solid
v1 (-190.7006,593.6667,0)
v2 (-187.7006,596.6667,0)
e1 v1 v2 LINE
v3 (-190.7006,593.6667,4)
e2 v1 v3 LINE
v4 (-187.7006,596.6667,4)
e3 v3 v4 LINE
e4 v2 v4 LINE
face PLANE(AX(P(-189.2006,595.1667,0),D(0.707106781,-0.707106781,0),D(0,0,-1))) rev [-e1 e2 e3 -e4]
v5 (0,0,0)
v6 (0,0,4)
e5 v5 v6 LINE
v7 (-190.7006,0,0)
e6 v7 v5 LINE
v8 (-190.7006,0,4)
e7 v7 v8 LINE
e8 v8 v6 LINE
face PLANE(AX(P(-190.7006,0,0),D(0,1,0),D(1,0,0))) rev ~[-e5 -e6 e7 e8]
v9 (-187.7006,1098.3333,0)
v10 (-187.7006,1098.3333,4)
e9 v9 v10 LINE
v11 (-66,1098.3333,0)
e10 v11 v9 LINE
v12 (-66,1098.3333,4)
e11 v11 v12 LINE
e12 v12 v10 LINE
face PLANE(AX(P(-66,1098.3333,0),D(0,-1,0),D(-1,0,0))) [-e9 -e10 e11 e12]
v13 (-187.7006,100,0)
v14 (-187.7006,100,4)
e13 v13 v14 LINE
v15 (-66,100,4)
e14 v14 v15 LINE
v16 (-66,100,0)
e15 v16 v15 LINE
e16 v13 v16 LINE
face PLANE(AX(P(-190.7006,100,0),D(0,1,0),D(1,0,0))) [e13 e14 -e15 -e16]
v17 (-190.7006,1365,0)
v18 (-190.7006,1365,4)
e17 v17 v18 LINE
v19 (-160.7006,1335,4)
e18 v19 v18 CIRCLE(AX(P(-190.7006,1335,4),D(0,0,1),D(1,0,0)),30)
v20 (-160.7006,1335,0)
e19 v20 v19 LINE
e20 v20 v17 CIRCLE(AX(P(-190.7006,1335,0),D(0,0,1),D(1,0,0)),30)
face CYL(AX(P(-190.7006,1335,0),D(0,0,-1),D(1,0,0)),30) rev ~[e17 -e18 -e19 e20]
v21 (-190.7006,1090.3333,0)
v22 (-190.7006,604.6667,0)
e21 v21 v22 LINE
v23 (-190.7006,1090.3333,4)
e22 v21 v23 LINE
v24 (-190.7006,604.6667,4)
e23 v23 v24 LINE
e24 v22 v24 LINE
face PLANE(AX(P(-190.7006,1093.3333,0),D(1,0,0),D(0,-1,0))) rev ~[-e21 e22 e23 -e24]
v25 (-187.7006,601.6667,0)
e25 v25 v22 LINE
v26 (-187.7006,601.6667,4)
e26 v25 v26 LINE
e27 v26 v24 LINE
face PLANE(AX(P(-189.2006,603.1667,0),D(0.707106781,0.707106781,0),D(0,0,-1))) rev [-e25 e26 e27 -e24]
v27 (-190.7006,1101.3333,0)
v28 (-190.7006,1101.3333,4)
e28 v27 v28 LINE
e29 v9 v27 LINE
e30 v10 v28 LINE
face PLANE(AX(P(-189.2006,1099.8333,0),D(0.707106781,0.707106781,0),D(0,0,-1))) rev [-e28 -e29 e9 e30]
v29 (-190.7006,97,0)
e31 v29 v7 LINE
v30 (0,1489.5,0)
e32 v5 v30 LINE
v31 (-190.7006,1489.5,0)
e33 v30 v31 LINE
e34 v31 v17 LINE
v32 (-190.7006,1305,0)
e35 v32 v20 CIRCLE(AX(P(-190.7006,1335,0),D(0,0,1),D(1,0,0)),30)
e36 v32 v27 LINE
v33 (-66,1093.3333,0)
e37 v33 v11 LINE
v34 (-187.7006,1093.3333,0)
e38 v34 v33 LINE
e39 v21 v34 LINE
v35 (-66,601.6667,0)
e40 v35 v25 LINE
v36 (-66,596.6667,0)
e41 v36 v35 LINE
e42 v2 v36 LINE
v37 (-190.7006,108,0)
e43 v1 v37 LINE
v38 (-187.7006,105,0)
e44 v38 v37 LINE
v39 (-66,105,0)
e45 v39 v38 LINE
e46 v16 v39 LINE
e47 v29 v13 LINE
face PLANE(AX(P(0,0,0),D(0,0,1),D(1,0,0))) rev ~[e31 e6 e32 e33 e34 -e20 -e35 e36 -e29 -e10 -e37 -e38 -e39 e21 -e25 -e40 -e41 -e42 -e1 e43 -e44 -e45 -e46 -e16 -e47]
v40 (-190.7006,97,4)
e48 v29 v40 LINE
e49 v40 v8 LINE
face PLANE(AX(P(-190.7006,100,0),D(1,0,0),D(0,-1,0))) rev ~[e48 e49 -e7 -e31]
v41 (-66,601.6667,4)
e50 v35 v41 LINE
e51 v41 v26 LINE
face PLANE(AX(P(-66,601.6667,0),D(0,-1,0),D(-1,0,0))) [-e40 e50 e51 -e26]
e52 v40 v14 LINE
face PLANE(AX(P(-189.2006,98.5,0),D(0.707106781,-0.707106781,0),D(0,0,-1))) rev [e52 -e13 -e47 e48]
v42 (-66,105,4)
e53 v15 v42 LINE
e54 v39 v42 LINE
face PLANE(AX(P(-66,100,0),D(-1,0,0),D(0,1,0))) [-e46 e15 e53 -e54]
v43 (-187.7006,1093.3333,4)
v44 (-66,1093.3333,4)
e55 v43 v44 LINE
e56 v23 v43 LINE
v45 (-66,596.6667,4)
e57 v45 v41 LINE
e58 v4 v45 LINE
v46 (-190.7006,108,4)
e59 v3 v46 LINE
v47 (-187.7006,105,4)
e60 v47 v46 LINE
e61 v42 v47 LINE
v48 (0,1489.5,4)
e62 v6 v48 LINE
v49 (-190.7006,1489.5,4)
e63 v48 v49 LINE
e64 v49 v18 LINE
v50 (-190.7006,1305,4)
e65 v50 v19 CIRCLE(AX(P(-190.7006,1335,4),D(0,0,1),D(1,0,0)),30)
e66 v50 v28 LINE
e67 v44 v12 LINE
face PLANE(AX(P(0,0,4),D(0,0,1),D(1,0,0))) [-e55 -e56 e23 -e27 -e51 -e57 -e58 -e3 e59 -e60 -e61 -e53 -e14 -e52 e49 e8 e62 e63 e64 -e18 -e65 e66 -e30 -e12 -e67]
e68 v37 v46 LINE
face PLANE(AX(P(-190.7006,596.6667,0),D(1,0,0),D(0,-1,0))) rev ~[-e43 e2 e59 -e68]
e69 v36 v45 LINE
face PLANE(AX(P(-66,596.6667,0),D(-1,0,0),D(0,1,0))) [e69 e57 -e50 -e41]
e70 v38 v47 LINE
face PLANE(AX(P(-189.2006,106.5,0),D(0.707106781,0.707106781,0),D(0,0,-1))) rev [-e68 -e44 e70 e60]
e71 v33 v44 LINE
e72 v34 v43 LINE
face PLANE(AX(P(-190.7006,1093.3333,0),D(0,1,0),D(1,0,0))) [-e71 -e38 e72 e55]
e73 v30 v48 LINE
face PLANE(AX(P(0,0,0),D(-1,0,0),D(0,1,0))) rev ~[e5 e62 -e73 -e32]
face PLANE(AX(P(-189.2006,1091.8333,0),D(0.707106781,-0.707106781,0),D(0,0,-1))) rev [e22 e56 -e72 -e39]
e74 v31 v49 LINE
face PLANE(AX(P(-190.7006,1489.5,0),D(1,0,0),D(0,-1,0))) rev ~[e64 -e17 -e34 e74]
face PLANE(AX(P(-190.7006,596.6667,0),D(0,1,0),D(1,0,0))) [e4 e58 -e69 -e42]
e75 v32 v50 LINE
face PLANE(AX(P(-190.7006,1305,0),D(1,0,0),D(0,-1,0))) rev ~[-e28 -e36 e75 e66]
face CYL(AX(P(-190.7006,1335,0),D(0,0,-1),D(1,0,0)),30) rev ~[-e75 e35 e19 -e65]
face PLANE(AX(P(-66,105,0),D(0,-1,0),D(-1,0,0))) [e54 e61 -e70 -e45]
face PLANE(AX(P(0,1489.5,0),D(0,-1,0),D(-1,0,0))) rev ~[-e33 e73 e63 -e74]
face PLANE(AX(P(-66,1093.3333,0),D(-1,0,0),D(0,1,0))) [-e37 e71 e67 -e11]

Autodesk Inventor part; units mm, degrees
ref_plane "YZ Plane" through (0, 0, 0) normal (1, 0, 0) x (0, 1, 0)
ref_plane "XZ Plane" through (0, 0, 0) normal (0, 1, 0) x (-1, 0, 0)
ref_plane "XY Plane" through (0, 0, 0) normal (0, 0, 1) x (1, 0, 0)
sketch "Sketch1" plane through (0, 0, 0) normal (0, 0, 1) x (1, 0, 0)
  line L0 (0, 1489.5) -> (-190.7006, 1489.5)
  line L1 (-190.7006, 1489.5) -> (-190.7006, 0)
  line L2 (-190.7006, 0) -> (0, 0)
  line L3 (0, 0) -> (0, 1489.5)
  line L4 (-190.7006, 100) -> (-66, 100)
  line L5 (-66, 100) -> (-66, 105)
  line L6 (-66, 105) -> (-190.7006, 105)
  line L7 (-190.7006, 105) -> (-190.7006, 100)
  line L8 (-190.7006, 596.6667) -> (-66, 596.6667)
  line L9 (-66, 596.6667) -> (-66, 601.6667)
  line L10 (-66, 601.6667) -> (-190.7006, 601.6667)
  line L11 (-190.7006, 601.6667) -> (-190.7006, 596.6667)
  line L12 (-190.7006, 1093.3333) -> (-66, 1093.3333)
  line L13 (-66, 1093.3333) -> (-66, 1098.3333)
  line L14 (-66, 1098.3333) -> (-190.7006, 1098.3333)
  line L15 (-190.7006, 1098.3333) -> (-190.7006, 1093.3333)
  circle A0 centre (-190.7006, 1335) radius 30
  point P0 (-190.7006, 1098.3333)
  point P1 (-190.7006, 1093.3333)
  point P2 (-190.7006, 601.6667)
  point P3 (-190.7006, 596.6667)
  point P4 (-190.7006, 1365)
  point P5 (-190.7006, 1305)
  dimension "d0" = 1489.5
  dimension "d1" = 190.7006
  dimension "d2" = 5
  dimension "d4" = 100
  dimension "d7" = 496.6667
  dimension "d23" = 66
  dimension "d29" = 60
  dimension "d30" = 1335
extrude "Plate1" add sketch "Sketch1" along normal blind 4 contours L3 L2 L1 L4 L5 L6 L8 L9 L10 L12 L13 L14 A0 L0
chamfer "Corner Chamfer1" distance 3 angle 45 6 edges at (-190.7006, 100, 2) (-190.7006, 105, 2) (-190.7006, 596.6667, 2) (-190.7006, 601.6667, 2) (-190.7006, 1098.3333, 2) (-190.7006, 1093.3333, 2)
equation "\"d0\" = Стрингер_длина"
equation "\"d1\" = стрингер_глубина_1"
equation "\"d2\" = паз_под_стрингер_толщина"
equation "\"d7\" = Шаг_шпангоутов"
equation "\"d23\" = паз_под_стрингер_глубина - Thickness"
equation "\"d29\" = 2 * радиус_выреза_под_сварку"
equation "\"d12\" = Thickness"
equation "\"BendRadius\" = Thickness"
equation "\"BendReliefWidth\" = Thickness"
equation "\"BendReliefDepth\" = 0.5 * Thickness"
equation "\"CornerReliefSize\" = 4 * Thickness"
equation "\"MinimumRemnant\" = 2 * Thickness"
equation "\"TransitionRadius\" = BendRadius"
equation "\"JacobiRadiusSize\" = BendRadius"
equation "\"GapSize\" = Thickness"
equation "\"Стрингер_длина\" = 1489.5"
equation "\"стрингер_глубина_1\" = 190.700557"
equation "\"паз_под_стрингер_толщина\" = 5"
equation "\"Шаг_шпангоутов\" = 496.666667"
equation "\"паз_под_стрингер_глубина\" = 70"
equation "\"Thickness\" = 4"
equation "\"радиус_выреза_под_сварку\" = 30"
properties part number "GBK 3113 stringer 1" material "Steel"
